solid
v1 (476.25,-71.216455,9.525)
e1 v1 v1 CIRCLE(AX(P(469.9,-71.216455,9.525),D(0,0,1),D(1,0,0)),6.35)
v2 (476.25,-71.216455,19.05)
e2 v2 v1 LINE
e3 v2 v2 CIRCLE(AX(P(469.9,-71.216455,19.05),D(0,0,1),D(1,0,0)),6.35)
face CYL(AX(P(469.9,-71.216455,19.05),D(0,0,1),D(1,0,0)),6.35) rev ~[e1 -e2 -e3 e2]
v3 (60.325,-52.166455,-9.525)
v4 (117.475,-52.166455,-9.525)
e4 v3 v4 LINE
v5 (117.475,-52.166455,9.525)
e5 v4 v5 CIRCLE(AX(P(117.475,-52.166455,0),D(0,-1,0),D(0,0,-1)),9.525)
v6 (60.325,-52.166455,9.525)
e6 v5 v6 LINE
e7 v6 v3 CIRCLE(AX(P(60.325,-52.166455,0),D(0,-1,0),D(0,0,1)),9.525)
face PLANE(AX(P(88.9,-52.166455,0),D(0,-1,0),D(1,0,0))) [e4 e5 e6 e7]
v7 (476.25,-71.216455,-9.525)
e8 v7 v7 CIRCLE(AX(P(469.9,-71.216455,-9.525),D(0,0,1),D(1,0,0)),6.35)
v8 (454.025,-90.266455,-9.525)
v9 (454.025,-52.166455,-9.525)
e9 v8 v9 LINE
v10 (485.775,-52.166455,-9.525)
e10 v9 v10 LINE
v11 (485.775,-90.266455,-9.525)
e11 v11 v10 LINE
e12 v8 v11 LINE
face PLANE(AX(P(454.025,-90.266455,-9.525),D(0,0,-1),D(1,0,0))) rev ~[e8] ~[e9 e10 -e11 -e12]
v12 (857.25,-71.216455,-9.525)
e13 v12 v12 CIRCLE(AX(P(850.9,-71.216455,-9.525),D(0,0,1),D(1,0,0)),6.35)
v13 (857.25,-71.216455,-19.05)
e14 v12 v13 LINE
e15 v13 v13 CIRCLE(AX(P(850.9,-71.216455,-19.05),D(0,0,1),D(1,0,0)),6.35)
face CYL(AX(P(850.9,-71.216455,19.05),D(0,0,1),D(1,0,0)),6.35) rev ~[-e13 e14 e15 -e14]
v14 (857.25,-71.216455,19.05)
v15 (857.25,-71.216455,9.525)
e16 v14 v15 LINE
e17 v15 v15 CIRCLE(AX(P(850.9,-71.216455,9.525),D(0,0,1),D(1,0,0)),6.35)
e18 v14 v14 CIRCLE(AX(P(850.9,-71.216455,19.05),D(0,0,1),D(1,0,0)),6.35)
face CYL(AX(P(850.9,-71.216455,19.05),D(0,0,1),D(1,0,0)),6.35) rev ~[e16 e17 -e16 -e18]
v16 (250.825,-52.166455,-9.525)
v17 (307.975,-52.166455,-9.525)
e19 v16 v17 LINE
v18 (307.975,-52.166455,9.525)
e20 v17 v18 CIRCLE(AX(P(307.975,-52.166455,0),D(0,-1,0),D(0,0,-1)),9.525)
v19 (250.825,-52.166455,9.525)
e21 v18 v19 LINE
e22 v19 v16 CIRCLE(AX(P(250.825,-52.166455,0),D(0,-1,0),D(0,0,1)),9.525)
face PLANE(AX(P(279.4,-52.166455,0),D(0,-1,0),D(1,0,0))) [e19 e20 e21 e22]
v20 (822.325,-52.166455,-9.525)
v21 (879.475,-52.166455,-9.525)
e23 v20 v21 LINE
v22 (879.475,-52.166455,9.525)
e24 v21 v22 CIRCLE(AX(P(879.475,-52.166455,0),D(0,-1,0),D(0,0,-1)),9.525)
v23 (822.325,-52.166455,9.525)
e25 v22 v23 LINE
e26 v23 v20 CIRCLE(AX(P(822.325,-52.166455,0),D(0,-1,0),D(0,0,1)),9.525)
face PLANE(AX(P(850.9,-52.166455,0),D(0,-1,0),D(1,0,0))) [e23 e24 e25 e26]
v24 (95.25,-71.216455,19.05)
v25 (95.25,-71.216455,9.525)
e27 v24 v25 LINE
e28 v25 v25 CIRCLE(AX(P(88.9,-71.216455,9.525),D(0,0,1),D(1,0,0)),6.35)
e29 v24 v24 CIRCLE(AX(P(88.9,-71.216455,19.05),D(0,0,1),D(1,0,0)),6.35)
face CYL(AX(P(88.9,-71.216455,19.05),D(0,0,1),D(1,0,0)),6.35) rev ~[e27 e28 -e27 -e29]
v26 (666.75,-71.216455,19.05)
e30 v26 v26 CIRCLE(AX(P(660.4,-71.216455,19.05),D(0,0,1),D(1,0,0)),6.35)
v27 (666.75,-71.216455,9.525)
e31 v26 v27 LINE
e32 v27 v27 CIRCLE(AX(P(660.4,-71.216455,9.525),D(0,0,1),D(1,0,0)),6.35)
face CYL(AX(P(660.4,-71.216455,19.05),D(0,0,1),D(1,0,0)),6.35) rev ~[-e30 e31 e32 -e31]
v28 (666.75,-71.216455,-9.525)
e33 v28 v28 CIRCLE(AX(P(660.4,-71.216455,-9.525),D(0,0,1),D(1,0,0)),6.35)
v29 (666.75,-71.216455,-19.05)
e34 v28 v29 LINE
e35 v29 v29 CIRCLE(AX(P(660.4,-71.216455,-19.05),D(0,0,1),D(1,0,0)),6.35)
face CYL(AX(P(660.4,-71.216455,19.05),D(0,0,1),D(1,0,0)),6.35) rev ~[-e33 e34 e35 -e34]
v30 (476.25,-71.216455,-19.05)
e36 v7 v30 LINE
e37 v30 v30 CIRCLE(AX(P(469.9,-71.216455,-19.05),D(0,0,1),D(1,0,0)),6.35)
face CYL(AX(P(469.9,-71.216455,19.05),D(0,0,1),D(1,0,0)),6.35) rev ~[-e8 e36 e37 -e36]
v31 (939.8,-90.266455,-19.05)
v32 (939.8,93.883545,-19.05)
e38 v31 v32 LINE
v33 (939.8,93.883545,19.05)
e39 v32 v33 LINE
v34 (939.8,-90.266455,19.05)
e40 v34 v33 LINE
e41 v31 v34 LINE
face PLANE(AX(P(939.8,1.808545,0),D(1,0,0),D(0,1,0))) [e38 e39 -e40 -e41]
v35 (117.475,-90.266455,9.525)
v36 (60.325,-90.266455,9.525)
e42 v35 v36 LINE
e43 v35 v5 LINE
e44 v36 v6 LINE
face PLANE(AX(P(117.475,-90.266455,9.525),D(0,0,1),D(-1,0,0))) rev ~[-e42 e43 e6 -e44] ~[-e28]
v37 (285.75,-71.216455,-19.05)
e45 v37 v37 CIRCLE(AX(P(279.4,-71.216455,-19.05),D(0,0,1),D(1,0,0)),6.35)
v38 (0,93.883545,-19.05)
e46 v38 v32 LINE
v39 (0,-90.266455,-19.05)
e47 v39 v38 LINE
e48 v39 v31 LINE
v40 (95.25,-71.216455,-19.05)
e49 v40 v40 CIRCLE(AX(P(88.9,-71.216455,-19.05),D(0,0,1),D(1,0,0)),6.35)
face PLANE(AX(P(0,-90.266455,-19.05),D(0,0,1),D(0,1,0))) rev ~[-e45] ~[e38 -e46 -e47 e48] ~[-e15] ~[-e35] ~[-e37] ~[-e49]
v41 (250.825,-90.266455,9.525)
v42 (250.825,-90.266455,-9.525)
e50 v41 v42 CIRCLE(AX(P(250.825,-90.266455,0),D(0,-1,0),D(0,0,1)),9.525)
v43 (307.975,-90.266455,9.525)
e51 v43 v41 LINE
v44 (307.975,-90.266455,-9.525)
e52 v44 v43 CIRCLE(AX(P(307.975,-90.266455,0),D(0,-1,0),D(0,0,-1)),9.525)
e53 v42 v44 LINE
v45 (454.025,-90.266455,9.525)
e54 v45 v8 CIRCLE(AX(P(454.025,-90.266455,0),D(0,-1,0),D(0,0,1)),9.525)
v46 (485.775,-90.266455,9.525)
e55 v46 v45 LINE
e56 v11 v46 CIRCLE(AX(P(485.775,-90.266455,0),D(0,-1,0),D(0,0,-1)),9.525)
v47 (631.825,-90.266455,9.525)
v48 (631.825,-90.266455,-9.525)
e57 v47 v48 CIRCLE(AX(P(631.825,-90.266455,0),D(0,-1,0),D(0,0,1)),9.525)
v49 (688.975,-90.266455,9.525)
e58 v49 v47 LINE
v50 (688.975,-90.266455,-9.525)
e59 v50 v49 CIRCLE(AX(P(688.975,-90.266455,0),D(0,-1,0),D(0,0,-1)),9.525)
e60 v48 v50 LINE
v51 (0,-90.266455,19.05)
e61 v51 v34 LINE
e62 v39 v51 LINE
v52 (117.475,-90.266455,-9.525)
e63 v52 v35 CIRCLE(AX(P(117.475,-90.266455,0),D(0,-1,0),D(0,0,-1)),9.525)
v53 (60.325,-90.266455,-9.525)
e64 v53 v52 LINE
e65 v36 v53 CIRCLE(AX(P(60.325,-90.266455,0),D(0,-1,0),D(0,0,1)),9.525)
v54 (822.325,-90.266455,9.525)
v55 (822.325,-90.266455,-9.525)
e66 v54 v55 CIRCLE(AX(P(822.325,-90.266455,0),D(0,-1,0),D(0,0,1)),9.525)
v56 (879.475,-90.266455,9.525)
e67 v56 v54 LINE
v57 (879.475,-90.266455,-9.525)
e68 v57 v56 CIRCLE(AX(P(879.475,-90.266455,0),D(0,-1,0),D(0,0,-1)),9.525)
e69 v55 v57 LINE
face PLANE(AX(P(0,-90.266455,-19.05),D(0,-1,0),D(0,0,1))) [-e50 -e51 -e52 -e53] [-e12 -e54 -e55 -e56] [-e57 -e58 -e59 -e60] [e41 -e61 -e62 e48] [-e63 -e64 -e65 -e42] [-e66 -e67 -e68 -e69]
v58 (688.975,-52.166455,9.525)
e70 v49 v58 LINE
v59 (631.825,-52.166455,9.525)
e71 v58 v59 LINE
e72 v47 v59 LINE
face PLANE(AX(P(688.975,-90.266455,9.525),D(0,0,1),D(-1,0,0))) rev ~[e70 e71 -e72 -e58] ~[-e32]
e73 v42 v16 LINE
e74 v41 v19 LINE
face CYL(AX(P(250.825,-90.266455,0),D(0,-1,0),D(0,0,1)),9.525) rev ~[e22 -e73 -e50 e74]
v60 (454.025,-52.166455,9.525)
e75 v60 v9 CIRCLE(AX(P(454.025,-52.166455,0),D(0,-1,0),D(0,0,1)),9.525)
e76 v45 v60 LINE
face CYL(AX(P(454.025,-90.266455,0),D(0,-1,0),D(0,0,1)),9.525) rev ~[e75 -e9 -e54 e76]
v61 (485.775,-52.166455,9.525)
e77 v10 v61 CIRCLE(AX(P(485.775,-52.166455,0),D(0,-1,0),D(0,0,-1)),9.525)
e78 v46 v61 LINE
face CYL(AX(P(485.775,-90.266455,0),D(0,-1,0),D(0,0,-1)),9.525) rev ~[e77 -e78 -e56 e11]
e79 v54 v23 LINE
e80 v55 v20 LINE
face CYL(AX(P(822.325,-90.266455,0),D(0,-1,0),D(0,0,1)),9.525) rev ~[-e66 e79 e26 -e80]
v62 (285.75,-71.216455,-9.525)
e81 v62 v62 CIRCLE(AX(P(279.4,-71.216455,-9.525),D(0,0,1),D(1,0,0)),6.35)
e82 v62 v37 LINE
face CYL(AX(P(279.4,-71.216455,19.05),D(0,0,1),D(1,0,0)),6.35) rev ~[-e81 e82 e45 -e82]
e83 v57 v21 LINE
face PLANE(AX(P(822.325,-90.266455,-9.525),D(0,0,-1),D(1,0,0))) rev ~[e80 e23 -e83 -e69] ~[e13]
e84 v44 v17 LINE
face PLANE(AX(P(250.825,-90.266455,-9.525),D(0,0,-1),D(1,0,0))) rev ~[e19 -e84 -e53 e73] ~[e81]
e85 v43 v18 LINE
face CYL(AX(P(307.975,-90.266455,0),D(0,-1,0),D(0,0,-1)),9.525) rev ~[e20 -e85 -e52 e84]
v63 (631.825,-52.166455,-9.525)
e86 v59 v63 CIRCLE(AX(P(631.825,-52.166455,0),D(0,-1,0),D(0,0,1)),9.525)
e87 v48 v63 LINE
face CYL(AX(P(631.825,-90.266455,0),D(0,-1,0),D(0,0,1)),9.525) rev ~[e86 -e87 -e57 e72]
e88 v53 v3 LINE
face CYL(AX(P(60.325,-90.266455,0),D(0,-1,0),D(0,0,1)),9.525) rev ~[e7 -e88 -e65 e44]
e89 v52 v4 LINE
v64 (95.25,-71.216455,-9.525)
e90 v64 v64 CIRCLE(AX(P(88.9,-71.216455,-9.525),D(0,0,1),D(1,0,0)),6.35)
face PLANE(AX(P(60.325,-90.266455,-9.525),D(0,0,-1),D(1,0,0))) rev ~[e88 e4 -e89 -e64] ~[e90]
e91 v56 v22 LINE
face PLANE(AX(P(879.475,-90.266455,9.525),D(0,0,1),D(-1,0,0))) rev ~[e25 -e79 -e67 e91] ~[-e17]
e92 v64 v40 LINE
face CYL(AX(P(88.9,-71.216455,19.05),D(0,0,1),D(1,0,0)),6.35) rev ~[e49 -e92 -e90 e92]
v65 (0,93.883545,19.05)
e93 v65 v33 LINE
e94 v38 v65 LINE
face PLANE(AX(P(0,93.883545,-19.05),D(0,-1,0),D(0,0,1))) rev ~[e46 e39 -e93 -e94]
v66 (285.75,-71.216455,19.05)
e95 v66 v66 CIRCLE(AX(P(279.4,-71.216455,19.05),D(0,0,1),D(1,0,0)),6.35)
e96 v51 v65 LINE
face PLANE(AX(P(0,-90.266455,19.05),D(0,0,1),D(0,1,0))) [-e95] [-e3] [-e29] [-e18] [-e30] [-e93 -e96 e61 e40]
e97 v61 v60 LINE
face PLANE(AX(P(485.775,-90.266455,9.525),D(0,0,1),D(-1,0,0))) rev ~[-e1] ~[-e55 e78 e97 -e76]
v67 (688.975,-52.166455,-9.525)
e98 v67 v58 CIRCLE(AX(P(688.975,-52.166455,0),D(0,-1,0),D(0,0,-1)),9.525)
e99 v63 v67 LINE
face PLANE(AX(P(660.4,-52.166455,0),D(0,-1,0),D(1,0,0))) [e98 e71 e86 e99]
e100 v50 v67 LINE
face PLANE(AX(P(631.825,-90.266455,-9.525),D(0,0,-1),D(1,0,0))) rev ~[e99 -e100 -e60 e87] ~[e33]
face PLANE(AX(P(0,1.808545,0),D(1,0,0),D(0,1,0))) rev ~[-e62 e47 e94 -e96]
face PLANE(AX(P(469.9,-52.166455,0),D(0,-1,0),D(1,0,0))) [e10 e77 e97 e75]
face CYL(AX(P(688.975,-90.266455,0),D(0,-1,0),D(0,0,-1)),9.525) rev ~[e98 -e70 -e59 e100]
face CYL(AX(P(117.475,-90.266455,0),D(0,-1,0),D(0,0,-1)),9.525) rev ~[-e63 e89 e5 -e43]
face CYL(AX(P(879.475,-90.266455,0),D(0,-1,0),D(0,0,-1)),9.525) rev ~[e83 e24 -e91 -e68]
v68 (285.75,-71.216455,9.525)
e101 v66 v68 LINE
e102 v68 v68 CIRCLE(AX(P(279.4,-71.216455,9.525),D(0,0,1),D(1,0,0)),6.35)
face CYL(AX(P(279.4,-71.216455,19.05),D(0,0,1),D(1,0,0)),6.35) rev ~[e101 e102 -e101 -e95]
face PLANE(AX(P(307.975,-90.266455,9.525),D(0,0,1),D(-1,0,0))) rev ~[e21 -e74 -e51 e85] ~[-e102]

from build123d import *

# Parameters (mm, degrees)
F0_W     = 184.15
F0_H     = 38.1
F1_DEPTH = 939.8
F3_DEPTH = 38.1
F4_R     = 6.35
F5_DEPTH = 38.101


# Not quite as in the source:
# - a feature names something its author has since deleted; it is built from what else it names


with BuildPart() as f1:
    # F0 (on Right) → F1 (new body)
    with BuildSketch(Plane.YZ):
        with Locations((1.8085447712, 0)):
            Rectangle(F0_W, F0_H)
    extrude(amount=F1_DEPTH)

    # F2 (on face) → F3 (cut)
    with BuildSketch(Plane.XZ.offset(90.2664552288)):
        with BuildLine():
            Line((117.475, 9.525), (60.325, 9.525))
            ThreePointArc((60.325, 9.525), (50.8, 0), (60.325, -9.525))
            Line((60.325, -9.525), (117.475, -9.525))
            ThreePointArc((117.475, -9.525), (127, 0), (117.475, 9.525))
        make_face()
        with BuildLine():
            Line((307.975, 9.525), (250.825, 9.525))
            ThreePointArc((250.825, 9.525), (241.3, 0), (250.825, -9.525))
            Line((250.825, -9.525), (307.975, -9.525))
            ThreePointArc((307.975, -9.525), (317.5, 0), (307.975, 9.525))
        make_face()
        with BuildLine():
            Line((688.975, 9.525), (631.825, 9.525))
            ThreePointArc((631.825, 9.525), (622.3, 0), (631.825, -9.525))
            Line((631.825, -9.525), (688.975, -9.525))
            ThreePointArc((688.975, -9.525), (698.5, 0), (688.975, 9.525))
        make_face()
        with BuildLine():
            Line((879.475, 9.525), (822.325, 9.525))
            ThreePointArc((822.325, 9.525), (812.8, 0), (822.325, -9.525))
            Line((822.325, -9.525), (879.475, -9.525))
            ThreePointArc((879.475, -9.525), (889, 0), (879.475, 9.525))
        make_face()
        with BuildLine():
            Line((485.775, 9.525), (454.025, 9.525))
            ThreePointArc((454.025, 9.525), (444.5, 0), (454.025, -9.525))
            Line((454.025, -9.525), (485.775, -9.525))
            ThreePointArc((485.775, -9.525), (495.3, 0), (485.775, 9.525))
        make_face()
    extrude(amount=-F3_DEPTH, mode=Mode.SUBTRACT)

    # F4 (on face) → F5 (cut, through all)
    with BuildSketch(Plane.XY.offset(19.05)):
        with Locations((88.9, -71.2164552288)):
            Circle(F4_R)
        with Locations((279.4, -71.2164552288)):
            Circle(F4_R)
        with Locations((469.9, -71.2164552288)):
            Circle(F4_R)
        with Locations((660.4, -71.2164552288)):
            Circle(F4_R)
        with Locations((850.9, -71.2164552288)):
            Circle(F4_R)
    extrude(amount=-F5_DEPTH, mode=Mode.SUBTRACT)


solid = f1.part
